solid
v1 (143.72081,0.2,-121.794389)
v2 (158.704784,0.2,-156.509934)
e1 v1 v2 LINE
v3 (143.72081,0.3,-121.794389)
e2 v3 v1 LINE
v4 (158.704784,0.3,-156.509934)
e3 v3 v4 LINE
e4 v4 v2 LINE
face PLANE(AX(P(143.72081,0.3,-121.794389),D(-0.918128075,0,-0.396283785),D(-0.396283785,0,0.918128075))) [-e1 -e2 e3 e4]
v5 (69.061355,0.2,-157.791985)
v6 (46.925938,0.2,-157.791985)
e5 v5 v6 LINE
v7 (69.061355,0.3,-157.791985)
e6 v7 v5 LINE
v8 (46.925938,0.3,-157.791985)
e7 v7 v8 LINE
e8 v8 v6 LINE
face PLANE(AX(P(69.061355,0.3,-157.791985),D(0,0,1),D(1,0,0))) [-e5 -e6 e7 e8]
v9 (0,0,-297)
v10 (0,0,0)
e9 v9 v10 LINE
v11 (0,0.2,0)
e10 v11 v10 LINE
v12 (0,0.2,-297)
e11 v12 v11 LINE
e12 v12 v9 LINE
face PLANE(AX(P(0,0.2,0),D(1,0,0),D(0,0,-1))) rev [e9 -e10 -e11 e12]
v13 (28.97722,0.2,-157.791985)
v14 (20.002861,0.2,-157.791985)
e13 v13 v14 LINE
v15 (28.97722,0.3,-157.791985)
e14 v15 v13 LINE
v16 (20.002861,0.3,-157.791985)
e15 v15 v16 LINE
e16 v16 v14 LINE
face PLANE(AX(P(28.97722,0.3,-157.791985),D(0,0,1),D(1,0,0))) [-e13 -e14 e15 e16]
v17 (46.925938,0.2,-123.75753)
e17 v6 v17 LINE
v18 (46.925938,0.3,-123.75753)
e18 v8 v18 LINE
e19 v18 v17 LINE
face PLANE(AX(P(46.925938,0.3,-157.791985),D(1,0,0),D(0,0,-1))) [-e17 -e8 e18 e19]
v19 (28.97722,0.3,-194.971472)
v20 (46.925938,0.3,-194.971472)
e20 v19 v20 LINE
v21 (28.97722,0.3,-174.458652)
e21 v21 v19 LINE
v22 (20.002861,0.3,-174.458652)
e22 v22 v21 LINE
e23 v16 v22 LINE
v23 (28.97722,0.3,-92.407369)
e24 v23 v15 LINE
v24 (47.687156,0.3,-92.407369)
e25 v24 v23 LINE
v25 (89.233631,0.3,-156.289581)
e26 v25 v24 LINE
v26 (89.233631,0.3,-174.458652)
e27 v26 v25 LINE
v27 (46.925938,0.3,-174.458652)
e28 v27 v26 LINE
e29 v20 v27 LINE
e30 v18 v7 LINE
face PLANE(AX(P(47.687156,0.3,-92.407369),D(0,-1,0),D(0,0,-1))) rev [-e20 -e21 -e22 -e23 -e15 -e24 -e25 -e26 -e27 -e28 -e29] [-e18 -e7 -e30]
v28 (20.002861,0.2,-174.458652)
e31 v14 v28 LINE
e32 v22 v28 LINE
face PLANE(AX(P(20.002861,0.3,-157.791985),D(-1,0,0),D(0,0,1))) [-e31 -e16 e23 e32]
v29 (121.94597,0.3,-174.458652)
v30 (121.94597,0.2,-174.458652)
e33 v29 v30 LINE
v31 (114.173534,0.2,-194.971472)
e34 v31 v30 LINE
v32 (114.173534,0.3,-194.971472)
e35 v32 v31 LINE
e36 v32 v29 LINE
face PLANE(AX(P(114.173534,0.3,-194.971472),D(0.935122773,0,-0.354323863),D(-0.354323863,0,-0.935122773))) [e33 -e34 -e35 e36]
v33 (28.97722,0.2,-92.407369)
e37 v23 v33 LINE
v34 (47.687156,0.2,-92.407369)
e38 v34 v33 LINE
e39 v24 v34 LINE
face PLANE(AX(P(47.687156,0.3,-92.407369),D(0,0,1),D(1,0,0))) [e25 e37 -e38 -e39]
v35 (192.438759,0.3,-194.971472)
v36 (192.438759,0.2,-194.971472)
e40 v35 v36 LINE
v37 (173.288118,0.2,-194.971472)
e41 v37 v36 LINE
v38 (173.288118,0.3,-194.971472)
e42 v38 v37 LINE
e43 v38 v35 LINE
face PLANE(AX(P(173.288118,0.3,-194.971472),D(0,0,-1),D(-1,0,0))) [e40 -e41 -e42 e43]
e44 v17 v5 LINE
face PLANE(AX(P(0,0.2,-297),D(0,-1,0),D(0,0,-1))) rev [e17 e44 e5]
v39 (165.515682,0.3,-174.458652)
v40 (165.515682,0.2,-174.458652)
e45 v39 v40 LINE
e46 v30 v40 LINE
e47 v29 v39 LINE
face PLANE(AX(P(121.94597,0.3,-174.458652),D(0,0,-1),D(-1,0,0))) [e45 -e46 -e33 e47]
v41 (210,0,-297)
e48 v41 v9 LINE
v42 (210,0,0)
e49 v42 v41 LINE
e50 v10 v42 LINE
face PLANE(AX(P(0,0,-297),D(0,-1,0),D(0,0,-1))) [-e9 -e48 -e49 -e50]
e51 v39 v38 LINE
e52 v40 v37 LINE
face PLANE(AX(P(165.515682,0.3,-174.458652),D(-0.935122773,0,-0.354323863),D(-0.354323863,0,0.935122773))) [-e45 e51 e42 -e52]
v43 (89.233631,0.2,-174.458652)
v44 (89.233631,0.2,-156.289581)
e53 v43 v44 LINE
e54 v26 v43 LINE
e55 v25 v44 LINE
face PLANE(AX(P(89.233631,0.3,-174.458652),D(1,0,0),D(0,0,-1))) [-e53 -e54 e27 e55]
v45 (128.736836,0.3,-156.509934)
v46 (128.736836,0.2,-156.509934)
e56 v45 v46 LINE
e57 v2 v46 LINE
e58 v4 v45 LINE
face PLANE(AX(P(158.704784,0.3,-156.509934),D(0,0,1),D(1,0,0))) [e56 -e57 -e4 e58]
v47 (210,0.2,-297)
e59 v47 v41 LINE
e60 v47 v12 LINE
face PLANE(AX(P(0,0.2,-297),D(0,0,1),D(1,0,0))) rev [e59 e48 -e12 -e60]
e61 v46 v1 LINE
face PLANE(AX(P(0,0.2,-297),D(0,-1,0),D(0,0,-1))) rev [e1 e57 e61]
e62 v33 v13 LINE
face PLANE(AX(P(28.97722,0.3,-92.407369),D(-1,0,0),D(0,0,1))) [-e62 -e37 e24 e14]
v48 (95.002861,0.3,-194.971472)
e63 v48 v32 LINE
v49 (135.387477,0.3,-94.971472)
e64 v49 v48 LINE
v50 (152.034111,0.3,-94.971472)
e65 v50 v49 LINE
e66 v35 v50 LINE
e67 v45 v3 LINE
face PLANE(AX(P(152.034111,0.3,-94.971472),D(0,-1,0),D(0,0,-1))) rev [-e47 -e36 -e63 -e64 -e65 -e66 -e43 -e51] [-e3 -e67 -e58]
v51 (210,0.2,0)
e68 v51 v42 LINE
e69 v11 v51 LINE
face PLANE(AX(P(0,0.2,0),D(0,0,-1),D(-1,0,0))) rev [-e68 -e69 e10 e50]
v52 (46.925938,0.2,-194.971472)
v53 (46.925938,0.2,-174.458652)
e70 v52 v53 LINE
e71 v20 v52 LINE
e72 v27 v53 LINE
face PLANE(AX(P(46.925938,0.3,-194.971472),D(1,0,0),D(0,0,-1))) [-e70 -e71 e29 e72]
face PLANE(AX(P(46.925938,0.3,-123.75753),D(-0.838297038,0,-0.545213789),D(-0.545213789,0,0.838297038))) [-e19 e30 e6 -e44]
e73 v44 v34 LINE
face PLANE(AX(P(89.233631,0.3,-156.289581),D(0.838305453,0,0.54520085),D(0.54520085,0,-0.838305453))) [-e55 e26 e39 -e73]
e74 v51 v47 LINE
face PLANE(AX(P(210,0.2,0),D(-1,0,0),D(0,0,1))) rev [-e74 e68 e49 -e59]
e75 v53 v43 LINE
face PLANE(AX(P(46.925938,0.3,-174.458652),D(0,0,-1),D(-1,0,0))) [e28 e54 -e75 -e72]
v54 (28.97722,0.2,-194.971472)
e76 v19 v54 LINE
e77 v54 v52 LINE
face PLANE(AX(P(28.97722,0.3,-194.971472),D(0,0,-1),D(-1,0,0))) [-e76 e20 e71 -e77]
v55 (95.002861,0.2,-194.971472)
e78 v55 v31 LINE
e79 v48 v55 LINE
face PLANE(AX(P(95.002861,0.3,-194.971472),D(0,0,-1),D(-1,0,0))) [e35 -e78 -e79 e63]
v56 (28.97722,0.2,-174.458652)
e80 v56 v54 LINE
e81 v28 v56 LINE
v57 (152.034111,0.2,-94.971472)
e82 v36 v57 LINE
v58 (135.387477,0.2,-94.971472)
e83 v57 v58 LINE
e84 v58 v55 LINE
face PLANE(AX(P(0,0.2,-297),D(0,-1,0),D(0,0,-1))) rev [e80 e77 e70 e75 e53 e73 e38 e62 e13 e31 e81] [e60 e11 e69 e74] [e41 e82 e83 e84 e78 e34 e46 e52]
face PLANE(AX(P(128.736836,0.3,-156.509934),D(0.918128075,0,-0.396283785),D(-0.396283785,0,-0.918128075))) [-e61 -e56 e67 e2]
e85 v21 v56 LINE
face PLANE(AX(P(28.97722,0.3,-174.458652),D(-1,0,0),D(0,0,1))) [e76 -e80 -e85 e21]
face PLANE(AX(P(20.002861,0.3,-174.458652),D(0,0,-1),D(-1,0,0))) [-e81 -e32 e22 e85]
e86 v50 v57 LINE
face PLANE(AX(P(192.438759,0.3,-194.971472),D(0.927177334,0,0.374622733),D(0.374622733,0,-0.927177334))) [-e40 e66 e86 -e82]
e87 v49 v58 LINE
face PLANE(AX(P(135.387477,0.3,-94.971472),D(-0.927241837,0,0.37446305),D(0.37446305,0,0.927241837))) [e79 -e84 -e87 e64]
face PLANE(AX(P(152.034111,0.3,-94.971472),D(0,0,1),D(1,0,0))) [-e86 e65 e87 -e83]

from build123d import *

# Parameters (mm, degrees)
SKETCH1_W      = 210
SKETCH1_H      = 297
EXTRUDE1_DEPTH = 0.2
EXTRUDE2_START = 0.2
EXTRUDE2_DEPTH = 0.1


# Read off the part's stored shape, not the designer's step: Extrude2
with BuildPart() as part:
    # Sketch1 → Extrude1 (new body)
    with BuildSketch(Plane(origin=(0, 0, 0), x_dir=(1, 0, 0), z_dir=(0, 1, 0))):
        with Locations((105, 148.5)):
            Rectangle(SKETCH1_W, SKETCH1_H)
    extrude(amount=EXTRUDE1_DEPTH)

    # Extrude2 outline → Extrude2 (add)
    # profile 1 of 2: a face of its own
    with BuildSketch(Plane(origin=(0, 0, 0), x_dir=(1, 0, 0), z_dir=(0, 1, 0)).offset(EXTRUDE2_START)):
        Polygon((135.38747678, 94.971472029), (152.034111396, 94.971472029), (192.438758831, 194.971472029), (173.288117806, 194.971472029), (165.515681908, 174.458651516), (121.94597037, 174.458651516), (114.173534472, 194.971472029), (95.002861396, 194.971472029), align=None)
        Polygon((158.704784472, 156.509933567), (143.720810113, 121.794388695), (128.736835755, 156.509933567), align=None, mode=Mode.SUBTRACT)
    # profile 2 of 2: a face of its own
    with BuildSketch(Plane(origin=(0, 0, 0), x_dir=(1, 0, 0), z_dir=(0, 1, 0)).offset(EXTRUDE2_START)):
        Polygon((46.925938319, 174.458651516), (46.925938319, 194.971472029), (28.97722037, 194.971472029), (28.97722037, 174.458651516), (20.002861396, 174.458651516), (20.002861396, 157.791984849), (28.97722037, 157.791984849), (28.97722037, 92.407369465), (47.687156267, 92.407369465), (89.233630626, 156.289581003), (89.233630626, 174.458651516), align=None)
        Polygon((69.061354985, 157.791984849), (46.925938319, 123.757529721), (46.925938319, 157.791984849), align=None, mode=Mode.SUBTRACT)
    extrude(amount=EXTRUDE2_DEPTH)


solid = part.part
